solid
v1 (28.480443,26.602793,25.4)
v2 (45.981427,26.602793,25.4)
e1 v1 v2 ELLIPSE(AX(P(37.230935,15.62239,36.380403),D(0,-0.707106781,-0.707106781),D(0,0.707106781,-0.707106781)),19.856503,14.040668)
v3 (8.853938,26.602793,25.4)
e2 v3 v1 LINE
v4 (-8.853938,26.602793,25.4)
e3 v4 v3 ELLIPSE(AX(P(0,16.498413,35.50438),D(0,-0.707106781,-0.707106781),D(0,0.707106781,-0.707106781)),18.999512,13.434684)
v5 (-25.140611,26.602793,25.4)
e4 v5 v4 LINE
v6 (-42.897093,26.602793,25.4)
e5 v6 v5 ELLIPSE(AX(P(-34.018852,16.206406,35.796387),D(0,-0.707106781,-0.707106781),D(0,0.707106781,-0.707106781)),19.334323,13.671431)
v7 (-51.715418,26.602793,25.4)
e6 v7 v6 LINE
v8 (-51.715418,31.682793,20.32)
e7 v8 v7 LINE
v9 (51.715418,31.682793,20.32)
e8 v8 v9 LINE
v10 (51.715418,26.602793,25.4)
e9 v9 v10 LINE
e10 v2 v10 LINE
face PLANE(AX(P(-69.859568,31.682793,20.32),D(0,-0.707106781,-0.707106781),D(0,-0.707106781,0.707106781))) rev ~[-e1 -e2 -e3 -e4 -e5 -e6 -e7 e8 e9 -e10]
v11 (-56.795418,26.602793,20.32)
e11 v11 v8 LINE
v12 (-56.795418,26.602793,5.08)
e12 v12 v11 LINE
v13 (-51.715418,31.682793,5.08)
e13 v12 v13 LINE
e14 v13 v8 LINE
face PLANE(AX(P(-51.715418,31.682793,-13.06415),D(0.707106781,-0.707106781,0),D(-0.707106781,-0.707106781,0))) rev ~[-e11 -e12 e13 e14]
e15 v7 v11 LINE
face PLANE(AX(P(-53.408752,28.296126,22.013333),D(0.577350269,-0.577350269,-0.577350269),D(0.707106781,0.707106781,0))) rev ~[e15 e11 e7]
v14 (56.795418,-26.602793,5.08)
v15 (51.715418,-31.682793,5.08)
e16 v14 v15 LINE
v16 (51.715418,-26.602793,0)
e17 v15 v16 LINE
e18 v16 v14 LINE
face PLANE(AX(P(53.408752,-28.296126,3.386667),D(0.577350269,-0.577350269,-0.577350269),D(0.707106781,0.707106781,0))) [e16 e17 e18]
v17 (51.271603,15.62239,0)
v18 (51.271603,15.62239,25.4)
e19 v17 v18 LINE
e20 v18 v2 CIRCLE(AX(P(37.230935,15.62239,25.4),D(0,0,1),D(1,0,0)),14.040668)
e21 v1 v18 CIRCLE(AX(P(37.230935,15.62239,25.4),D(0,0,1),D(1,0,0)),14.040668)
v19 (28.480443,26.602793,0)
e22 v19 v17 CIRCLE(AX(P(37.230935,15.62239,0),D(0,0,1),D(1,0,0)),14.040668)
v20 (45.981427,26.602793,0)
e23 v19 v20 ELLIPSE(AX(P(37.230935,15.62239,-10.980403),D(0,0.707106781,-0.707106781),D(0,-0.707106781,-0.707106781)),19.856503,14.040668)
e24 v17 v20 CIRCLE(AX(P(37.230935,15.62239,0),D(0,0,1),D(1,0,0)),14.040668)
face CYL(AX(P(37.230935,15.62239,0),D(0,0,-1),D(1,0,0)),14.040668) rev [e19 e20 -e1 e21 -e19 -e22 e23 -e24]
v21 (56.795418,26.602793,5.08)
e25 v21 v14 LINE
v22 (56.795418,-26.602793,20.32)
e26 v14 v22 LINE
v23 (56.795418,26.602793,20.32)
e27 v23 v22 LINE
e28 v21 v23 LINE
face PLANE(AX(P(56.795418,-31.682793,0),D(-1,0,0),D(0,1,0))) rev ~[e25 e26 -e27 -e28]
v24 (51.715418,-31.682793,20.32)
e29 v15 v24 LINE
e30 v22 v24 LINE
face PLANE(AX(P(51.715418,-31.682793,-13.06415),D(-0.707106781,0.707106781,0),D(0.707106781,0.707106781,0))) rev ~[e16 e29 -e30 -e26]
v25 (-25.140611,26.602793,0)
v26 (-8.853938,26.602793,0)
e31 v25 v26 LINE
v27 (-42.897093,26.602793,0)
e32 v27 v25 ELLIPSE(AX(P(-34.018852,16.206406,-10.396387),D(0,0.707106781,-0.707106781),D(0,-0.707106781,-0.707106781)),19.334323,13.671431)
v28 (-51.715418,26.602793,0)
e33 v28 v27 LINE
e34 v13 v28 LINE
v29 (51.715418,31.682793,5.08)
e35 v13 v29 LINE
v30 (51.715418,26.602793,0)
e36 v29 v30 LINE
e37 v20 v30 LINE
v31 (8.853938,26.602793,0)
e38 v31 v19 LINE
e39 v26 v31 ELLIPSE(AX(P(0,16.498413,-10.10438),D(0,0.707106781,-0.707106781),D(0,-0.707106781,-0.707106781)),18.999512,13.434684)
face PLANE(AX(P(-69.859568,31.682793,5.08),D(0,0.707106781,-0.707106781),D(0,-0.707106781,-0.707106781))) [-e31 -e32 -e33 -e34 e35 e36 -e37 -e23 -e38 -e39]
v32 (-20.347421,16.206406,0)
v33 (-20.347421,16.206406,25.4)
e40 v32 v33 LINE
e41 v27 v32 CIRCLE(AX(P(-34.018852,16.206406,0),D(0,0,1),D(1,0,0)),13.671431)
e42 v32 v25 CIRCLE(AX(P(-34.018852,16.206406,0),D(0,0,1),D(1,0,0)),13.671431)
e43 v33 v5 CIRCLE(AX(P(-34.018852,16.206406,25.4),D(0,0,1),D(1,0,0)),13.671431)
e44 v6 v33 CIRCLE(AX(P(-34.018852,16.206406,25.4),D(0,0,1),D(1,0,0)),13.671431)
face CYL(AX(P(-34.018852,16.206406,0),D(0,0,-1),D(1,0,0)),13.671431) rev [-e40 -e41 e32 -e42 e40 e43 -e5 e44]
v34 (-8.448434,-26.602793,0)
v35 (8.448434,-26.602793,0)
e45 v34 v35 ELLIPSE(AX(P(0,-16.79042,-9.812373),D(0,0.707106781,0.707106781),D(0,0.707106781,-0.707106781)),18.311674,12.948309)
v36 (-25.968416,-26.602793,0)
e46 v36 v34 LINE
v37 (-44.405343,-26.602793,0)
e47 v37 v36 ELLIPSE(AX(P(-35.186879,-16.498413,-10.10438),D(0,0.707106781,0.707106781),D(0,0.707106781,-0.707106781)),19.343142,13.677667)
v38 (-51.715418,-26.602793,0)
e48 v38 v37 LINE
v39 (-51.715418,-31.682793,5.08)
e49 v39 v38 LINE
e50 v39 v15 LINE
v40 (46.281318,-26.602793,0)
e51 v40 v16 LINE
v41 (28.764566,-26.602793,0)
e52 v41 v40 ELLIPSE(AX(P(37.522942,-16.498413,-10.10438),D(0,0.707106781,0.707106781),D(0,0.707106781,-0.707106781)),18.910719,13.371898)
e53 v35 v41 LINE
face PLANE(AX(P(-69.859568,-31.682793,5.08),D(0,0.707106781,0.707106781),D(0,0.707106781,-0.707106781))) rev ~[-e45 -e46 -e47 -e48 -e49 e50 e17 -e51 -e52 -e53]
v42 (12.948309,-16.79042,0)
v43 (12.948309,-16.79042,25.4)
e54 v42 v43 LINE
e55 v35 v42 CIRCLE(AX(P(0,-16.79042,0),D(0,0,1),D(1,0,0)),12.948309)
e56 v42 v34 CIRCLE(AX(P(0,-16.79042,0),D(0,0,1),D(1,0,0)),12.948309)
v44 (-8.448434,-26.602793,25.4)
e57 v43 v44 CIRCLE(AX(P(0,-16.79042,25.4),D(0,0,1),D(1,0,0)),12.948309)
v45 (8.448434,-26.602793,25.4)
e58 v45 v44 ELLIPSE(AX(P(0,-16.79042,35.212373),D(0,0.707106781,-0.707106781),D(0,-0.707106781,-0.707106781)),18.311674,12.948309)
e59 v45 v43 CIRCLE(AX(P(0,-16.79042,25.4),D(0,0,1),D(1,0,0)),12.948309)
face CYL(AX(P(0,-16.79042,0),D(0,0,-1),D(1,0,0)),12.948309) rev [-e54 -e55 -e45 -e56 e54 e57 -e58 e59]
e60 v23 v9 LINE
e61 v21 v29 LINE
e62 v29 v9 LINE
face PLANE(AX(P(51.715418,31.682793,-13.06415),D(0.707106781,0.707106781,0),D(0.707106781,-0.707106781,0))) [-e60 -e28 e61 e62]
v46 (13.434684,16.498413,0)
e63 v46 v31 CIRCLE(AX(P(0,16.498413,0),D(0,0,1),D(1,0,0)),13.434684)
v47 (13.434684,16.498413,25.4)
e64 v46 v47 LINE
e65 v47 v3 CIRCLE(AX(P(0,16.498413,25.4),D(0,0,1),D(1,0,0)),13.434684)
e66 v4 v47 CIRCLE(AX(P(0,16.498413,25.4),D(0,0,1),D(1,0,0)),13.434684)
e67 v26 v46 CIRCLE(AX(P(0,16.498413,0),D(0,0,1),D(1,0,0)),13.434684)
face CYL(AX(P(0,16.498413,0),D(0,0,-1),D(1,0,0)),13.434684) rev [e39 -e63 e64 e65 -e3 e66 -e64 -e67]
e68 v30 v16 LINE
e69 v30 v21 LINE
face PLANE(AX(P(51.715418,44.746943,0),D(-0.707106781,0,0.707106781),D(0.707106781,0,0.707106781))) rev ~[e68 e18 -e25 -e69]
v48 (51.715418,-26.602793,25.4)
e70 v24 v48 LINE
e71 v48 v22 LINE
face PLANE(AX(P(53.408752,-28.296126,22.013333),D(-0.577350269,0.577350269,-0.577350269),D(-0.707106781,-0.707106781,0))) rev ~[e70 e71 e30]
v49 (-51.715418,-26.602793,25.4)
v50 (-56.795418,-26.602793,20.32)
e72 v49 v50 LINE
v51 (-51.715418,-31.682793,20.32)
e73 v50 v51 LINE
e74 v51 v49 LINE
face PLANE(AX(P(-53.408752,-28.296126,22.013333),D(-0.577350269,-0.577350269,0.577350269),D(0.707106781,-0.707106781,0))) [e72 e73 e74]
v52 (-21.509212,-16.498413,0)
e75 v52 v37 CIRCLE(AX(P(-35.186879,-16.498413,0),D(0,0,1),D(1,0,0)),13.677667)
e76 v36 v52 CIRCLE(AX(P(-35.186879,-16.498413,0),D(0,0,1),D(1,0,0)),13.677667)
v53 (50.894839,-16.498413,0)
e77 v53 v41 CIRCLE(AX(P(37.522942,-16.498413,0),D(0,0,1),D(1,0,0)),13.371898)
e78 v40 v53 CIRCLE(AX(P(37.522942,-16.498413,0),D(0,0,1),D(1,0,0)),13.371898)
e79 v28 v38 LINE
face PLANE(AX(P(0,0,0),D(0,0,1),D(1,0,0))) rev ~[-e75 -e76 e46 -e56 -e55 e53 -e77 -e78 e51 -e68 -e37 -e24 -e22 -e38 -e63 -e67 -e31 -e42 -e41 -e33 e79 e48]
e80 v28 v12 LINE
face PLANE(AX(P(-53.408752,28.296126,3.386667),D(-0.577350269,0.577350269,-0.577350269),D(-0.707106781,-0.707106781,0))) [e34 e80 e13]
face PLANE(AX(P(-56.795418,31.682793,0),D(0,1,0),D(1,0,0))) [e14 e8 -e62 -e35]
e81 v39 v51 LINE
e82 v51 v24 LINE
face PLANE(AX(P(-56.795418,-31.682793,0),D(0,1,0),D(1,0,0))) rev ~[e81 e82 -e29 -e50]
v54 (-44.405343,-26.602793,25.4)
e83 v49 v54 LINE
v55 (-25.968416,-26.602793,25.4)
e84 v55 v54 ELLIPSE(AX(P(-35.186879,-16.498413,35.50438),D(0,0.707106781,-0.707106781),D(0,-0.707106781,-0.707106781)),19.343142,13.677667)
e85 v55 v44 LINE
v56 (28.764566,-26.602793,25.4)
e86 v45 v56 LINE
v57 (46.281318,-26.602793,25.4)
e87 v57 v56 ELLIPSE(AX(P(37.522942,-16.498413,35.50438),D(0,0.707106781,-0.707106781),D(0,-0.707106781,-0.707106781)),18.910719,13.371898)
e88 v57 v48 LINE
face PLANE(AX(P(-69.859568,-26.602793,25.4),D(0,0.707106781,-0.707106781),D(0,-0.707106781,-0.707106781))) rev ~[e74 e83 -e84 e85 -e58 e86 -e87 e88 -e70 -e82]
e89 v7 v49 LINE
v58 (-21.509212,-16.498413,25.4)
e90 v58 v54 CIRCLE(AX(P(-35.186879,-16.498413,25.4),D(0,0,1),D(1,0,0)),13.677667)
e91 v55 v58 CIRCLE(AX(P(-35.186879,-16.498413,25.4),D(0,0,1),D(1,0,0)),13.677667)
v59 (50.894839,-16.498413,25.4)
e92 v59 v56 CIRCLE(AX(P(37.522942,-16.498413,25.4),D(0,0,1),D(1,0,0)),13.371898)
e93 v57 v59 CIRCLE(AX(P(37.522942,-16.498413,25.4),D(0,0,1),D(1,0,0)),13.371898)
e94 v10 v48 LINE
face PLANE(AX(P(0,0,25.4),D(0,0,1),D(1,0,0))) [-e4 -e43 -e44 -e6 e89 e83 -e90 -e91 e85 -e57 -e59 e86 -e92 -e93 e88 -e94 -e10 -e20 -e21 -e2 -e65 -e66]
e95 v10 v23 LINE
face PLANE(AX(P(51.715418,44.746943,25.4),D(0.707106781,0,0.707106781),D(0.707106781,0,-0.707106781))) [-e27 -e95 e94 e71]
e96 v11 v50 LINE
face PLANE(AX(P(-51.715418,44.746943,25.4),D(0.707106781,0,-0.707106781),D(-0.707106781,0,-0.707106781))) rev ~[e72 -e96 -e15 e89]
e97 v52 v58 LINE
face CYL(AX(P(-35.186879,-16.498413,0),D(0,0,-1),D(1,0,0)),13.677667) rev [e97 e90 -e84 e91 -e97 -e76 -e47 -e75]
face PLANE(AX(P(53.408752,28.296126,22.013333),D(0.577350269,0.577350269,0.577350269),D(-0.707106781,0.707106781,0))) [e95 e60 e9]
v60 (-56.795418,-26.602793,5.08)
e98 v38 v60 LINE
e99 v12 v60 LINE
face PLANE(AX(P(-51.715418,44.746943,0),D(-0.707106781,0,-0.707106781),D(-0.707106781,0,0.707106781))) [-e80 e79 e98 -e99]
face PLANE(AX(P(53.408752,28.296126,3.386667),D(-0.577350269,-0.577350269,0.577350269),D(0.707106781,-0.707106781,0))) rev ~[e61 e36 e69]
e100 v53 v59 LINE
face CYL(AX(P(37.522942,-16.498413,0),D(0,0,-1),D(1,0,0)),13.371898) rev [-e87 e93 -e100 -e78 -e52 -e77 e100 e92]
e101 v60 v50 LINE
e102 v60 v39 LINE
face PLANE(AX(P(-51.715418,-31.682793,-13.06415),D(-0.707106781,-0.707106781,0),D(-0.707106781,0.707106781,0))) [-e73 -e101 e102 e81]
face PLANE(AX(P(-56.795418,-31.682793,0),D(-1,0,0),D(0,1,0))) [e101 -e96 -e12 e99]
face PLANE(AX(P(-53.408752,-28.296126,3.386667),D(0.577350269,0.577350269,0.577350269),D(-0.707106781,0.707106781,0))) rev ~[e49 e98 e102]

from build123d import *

# Parameters (mm, degrees)
F0_W         = 113.590836525
F0_H         = 63.365586102
F0_R         = 13.6776668511
F0_R_2       = 12.9483089266
F0_R_3       = 13.3718975465
F0_R_4       = 13.6714310258
F0_R_5       = 14.0406678545
F0_R_6       = 13.4346835475
F1_DEPTH     = 25.4
F2_W         = 109.635181725
F2_H         = 62.0416179299
F2_R         = 13.6776668511
F2_R_2       = 12.9483089266
F2_R_3       = 13.3718975465
F2_R_4       = 13.6714310258
F2_R_5       = 14.0406678545
F2_R_6       = 13.4346835475
F3_DEPTH     = 12.7
F4_T1_DEPTH  = 6.4524666085
F4_T3_DEPTH  = 6.4524666085
F4_T5_DEPTH  = 6.4524666085
F4_T7_DEPTH  = 6.4524666085
F4_T9_DEPTH  = 6.4524666085
F4_T11_DEPTH = 6.4524666085
F4_T13_DEPTH = 6.4524666085
F4_T15_DEPTH = 6.4524666085
F4_T17_DEPTH = 89.4938852597
F4_T19_DEPTH = 139.7191356827
F4_T21_DEPTH = 51.5282991577


# Not quite as in the source:
# - a fillet or chamfer that OpenCascade refuses, or shapes differently, is made with other operations: its cross-section is extruded or revolved along the edge and cut away or added


with BuildPart() as f1:
    # F0 (on Top) → F1 (new body)
    with BuildSketch(Plane.XY):
        Rectangle(F0_W, F0_H)
        with Locations((-35.1868793368, -16.4984129369)):
            Circle(F0_R, mode=Mode.SUBTRACT)
        with Locations((0, -16.790419817)):
            Circle(F0_R_2, mode=Mode.SUBTRACT)
        with Locations((37.5229418278, -16.4984129369)):
            Circle(F0_R_3, mode=Mode.SUBTRACT)
        with Locations((-34.0188518167, 16.2064060569)):
            Circle(F0_R_4, mode=Mode.SUBTRACT)
        with Locations((37.2309349477, 15.6223904341)):
            Circle(F0_R_5, mode=Mode.SUBTRACT)
        with Locations((0, 16.4984129369)):
            Circle(F0_R_6, mode=Mode.SUBTRACT)
    extrude(amount=F1_DEPTH)

    # F2 (on face) → F3 (join)
    with BuildSketch(Plane.XY):
        Rectangle(F2_W, F2_H)
        with Locations((-35.1868793368, -16.4984129369)):
            Circle(F2_R, mode=Mode.SUBTRACT)
        with Locations((0, -16.790419817)):
            Circle(F2_R_2, mode=Mode.SUBTRACT)
        with Locations((37.5229418278, -16.4984129369)):
            Circle(F2_R_3, mode=Mode.SUBTRACT)
        with Locations((-34.0188518167, 16.2064060569)):
            Circle(F2_R_4, mode=Mode.SUBTRACT)
        with Locations((37.2309349477, 15.6223904341)):
            Circle(F2_R_5, mode=Mode.SUBTRACT)
        with Locations((0, 16.4984129369)):
            Circle(F2_R_6, mode=Mode.SUBTRACT)
    extrude(amount=F3_DEPTH)

    # F4: chamfer of 5.08 on 12 edges, made by hand

    # F4_s2 → F4_t1 (cut)
    with BuildSketch(Plane(origin=(26.1060704378, -26.1060704378, -26.1060704378), x_dir=(0.7071067812, 0.7071067812, 0), z_dir=(0.5773502692, -0.5773502692, -0.5773502692))):
        Polygon((14.165205132, 38.1949798276), (17.7573075804, 31.9732758809), (21.3494100289, 38.1949798276), align=None)
    extrude(amount=F4_T1_DEPTH, mode=Mode.SUBTRACT)

    # F4_s4 → F4_t3 (cut)
    with BuildSketch(Plane(origin=(26.1060704378, 26.1060704378, -26.1060704378), x_dir=(-0.7071067812, 0.7071067812, 0), z_dir=(0.5773502692, 0.5773502692, -0.5773502692))):
        Polygon((-14.165205132, 38.1949798276), (-17.7573075804, 31.9732758809), (-21.3494100289, 38.1949798276), align=None)
    extrude(amount=F4_T3_DEPTH, mode=Mode.SUBTRACT)

    # F4_s6 → F4_t5 (cut)
    with BuildSketch(Plane(origin=(-26.1060704378, 26.1060704378, -26.1060704378), x_dir=(-0.7071067812, -0.7071067812, 0), z_dir=(-0.5773502692, 0.5773502692, -0.5773502692))):
        Polygon((14.165205132, 38.1949798276), (17.7573075804, 31.9732758809), (21.3494100289, 38.1949798276), align=None)
    extrude(amount=F4_T5_DEPTH, mode=Mode.SUBTRACT)

    # F4_s8 → F4_t7 (cut)
    with BuildSketch(Plane(origin=(-26.1060704378, -26.1060704378, -26.1060704378), x_dir=(0.7071067812, -0.7071067812, 0), z_dir=(-0.5773502692, -0.5773502692, -0.5773502692))):
        Polygon((-14.165205132, 38.1949798276), (-17.7573075804, 31.9732758809), (-21.3494100289, 38.1949798276), align=None)
    extrude(amount=F4_T7_DEPTH, mode=Mode.SUBTRACT)

    # F4_s10 → F4_t9 (cut)
    with BuildSketch(Plane(origin=(-34.5727371045, 34.5727371045, 34.5727371045), x_dir=(-0.7071067812, -0.7071067812, 0), z_dir=(-0.5773502692, 0.5773502692, 0.5773502692))):
        Polygon((14.165205132, -17.455966672), (17.7573075804, -11.2342627254), (21.3494100289, -17.455966672), align=None)
    extrude(amount=F4_T9_DEPTH, mode=Mode.SUBTRACT)

    # F4_s12 → F4_t11 (cut)
    with BuildSketch(Plane(origin=(34.5727371045, -34.5727371045, 34.5727371045), x_dir=(0.7071067812, 0.7071067812, 0), z_dir=(0.5773502692, -0.5773502692, 0.5773502692))):
        Polygon((14.165205132, -17.455966672), (17.7573075804, -11.2342627254), (21.3494100289, -17.455966672), align=None)
    extrude(amount=F4_T11_DEPTH, mode=Mode.SUBTRACT)

    # F4_s14 → F4_t13 (cut)
    with BuildSketch(Plane(origin=(34.5727371045, 34.5727371045, 34.5727371045), x_dir=(-0.7071067812, 0.7071067812, 0), z_dir=(0.5773502692, 0.5773502692, 0.5773502692))):
        Polygon((-14.165205132, -17.455966672), (-17.7573075804, -11.2342627254), (-21.3494100289, -17.455966672), align=None)
    extrude(amount=F4_T13_DEPTH, mode=Mode.SUBTRACT)

    # F4_s16 → F4_t15 (cut)
    with BuildSketch(Plane(origin=(-34.5727371045, -34.5727371045, 34.5727371045), x_dir=(0.7071067812, -0.7071067812, 0), z_dir=(-0.5773502692, -0.5773502692, 0.5773502692))):
        Polygon((-14.165205132, -17.455966672), (-17.7573075804, -11.2342627254), (-21.3494100289, -17.455966672), align=None)
    extrude(amount=F4_T15_DEPTH, mode=Mode.SUBTRACT)

    # F4_s18 → F4_t17 (cut)
    with BuildSketch(Plane.XZ.offset(-44.7469426299)):
        Polygon((51.7154182625, 0), (56.7954182625, 5.08), (56.7954182625, 0), align=None)
        Polygon((-51.7154182625, 0), (-56.7954182625, 5.08), (-56.7954182625, 0), align=None)
        Polygon((-51.7154182625, 25.4), (-56.7954182625, 20.32), (-56.7954182625, 25.4), align=None)
        Polygon((51.7154182625, 25.4), (56.7954182625, 20.32), (56.7954182625, 25.4), align=None)
    extrude(amount=F4_T17_DEPTH, mode=Mode.SUBTRACT)

    # F4_s20 → F4_t19 (cut)
    with BuildSketch(Plane.YZ.offset(-69.8595678413)):
        Polygon((31.682793051, 5.08), (26.602793051, 0), (31.682793051, 0), align=None)
        Polygon((-31.682793051, 5.08), (-26.602793051, 0), (-31.682793051, 0), align=None)
        Polygon((31.682793051, 20.32), (26.602793051, 25.4), (31.682793051, 25.4), align=None)
        Polygon((-26.602793051, 25.4), (-31.682793051, 20.32), (-31.682793051, 25.4), align=None)
    extrude(amount=F4_T19_DEPTH, mode=Mode.SUBTRACT)

    # F4_s22 → F4_t21 (cut)
    with BuildSketch(Plane.XY.offset(-13.0641495789)):
        Polygon((-51.7154182625, 31.682793051), (-56.7954182625, 26.602793051), (-56.7954182625, 31.682793051), align=None)
        Polygon((51.7154182625, -31.682793051), (56.7954182625, -26.602793051), (56.7954182625, -31.682793051), align=None)
        Polygon((-51.7154182625, -31.682793051), (-56.7954182625, -26.602793051), (-56.7954182625, -31.682793051), align=None)
        Polygon((51.7154182625, 31.682793051), (56.7954182625, 26.602793051), (56.7954182625, 31.682793051), align=None)
    extrude(amount=F4_T21_DEPTH, mode=Mode.SUBTRACT)


solid = f1.part
